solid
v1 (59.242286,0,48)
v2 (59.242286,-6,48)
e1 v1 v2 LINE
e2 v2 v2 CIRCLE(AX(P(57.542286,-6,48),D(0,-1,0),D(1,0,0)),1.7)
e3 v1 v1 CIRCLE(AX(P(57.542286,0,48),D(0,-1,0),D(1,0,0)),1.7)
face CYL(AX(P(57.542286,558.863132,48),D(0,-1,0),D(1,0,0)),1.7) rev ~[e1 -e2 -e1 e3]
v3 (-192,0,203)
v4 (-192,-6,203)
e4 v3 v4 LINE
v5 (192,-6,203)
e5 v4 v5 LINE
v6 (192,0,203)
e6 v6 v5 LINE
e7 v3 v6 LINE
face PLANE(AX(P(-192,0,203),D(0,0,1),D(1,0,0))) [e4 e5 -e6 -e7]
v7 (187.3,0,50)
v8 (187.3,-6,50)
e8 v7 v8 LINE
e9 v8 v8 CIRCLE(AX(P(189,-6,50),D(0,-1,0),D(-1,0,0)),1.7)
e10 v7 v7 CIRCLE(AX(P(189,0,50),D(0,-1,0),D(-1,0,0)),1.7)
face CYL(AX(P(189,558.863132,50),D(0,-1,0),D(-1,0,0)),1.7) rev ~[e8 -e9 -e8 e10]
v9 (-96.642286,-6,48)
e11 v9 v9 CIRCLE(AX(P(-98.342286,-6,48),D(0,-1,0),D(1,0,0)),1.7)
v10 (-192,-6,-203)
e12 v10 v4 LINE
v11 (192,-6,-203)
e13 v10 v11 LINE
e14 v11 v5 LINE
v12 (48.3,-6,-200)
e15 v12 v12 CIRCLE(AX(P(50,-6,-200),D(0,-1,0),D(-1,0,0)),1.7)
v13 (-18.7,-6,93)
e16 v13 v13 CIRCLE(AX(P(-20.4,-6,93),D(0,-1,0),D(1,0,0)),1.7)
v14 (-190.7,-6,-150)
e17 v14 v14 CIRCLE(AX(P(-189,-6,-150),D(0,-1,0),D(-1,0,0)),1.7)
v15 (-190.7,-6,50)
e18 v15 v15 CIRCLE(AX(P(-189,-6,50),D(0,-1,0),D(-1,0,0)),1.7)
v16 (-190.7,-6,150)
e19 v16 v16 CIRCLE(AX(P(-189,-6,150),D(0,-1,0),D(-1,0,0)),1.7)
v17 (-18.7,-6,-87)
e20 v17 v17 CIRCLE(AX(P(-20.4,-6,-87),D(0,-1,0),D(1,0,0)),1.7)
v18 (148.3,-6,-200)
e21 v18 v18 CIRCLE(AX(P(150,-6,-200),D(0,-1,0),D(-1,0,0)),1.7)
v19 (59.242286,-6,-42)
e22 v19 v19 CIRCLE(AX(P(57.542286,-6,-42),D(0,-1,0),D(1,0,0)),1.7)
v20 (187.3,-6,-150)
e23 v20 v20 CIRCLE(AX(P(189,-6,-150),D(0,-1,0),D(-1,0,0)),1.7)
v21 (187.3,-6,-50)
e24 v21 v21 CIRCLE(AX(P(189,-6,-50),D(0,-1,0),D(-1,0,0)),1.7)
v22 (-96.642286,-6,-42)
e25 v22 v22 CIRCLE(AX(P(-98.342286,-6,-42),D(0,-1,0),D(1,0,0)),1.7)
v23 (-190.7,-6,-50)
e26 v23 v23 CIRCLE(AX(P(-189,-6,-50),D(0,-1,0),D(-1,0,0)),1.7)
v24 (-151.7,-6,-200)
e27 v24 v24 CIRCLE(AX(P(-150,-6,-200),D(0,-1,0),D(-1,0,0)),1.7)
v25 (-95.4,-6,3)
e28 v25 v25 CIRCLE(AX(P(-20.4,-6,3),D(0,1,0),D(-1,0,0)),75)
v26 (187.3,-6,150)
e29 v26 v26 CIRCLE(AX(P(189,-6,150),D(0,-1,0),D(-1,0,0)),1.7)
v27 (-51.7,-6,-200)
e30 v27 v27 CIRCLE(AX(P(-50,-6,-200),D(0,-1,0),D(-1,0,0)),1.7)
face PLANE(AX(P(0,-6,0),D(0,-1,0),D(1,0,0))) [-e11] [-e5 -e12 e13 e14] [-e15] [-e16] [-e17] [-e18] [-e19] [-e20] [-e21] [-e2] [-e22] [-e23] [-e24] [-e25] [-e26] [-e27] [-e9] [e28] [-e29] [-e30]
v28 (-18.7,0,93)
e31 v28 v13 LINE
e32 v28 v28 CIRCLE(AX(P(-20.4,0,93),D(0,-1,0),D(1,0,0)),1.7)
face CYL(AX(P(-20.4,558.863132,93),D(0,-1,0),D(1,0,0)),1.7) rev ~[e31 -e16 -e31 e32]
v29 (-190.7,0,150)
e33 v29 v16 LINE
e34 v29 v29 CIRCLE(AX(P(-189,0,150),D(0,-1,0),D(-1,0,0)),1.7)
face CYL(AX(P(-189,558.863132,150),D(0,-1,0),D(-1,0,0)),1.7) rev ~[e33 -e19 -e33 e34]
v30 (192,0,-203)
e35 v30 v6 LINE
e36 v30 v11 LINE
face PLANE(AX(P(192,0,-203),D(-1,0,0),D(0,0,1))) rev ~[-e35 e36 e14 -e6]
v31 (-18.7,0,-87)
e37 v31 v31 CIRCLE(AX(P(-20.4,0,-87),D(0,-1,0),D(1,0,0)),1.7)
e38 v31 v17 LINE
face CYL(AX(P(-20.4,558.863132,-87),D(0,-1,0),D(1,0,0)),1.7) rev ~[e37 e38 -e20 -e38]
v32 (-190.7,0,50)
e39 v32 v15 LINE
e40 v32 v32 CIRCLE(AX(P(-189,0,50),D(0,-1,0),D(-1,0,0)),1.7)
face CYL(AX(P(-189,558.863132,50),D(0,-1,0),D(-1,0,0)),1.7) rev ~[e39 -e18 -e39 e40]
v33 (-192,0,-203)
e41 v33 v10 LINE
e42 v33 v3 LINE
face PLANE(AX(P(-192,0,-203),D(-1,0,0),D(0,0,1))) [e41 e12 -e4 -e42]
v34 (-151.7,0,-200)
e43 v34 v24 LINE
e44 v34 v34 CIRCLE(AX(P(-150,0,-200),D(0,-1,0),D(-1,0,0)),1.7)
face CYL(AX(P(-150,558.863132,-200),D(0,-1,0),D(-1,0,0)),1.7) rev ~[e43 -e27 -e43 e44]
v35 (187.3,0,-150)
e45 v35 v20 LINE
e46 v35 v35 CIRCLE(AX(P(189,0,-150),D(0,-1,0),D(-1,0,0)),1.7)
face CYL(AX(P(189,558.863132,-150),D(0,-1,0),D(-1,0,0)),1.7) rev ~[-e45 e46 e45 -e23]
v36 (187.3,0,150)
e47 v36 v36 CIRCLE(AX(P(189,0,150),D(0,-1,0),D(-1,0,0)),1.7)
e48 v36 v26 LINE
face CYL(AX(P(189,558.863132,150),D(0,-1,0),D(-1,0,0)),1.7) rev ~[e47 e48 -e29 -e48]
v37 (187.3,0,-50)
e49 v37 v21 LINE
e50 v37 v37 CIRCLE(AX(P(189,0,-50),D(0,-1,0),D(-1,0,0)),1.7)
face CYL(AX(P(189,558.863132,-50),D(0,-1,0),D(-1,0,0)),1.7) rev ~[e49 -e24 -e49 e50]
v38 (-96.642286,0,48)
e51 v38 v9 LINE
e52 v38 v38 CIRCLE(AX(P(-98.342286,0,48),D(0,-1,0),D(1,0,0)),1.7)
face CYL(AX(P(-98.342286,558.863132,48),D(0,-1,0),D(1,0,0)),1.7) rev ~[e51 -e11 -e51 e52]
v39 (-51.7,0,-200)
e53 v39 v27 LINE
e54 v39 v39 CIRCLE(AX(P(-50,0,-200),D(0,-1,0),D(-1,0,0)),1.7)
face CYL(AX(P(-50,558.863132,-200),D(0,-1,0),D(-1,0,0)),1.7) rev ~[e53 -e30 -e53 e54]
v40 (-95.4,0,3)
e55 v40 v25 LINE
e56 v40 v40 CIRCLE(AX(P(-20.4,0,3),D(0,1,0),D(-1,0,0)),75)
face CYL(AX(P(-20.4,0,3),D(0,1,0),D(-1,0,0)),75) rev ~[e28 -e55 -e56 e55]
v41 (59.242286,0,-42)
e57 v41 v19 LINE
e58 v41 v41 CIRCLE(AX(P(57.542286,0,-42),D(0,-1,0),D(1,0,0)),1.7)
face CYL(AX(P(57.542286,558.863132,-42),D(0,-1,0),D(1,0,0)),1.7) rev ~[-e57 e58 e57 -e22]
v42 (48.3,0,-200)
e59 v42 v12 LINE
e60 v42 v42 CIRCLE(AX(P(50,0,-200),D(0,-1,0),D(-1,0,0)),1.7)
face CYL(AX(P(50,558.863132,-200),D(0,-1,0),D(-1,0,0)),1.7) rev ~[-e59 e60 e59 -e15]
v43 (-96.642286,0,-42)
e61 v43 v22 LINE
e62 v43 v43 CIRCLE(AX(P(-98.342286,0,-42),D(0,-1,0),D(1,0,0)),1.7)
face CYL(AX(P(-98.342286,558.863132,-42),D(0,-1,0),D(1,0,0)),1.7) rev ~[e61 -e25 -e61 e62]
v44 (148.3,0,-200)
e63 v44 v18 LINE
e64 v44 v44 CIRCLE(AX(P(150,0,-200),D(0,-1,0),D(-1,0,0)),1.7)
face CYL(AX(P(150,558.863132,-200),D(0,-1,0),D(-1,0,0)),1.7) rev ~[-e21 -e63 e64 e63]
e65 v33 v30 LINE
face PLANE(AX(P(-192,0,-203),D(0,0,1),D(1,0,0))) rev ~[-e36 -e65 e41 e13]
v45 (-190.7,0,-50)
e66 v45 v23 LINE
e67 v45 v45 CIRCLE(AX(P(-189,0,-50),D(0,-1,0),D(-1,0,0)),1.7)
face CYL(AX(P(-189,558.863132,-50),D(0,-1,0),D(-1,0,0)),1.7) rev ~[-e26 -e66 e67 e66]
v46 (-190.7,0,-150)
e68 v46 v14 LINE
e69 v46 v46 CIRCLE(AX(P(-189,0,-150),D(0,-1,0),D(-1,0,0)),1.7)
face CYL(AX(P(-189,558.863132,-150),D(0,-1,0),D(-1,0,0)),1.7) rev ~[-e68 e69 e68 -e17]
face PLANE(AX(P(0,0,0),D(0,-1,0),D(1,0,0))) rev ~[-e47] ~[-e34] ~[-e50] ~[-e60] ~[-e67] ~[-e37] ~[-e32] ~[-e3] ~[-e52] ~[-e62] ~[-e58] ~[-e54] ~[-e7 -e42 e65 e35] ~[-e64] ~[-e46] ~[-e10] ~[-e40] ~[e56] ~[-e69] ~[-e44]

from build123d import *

# Parameters (mm, degrees)
F0_W     = 384
F0_H     = 406
F2_DEPTH = 6
F3_D     = 3.4
F5_D     = 3.4
F4_R     = 75
F6_DEPTH = 6
F8_D     = 3.4
F9_D     = 3.4
F10_D    = 3.4


# Not quite as in the source:
# - a feature names something its author has since deleted; it is built from what else it names


with BuildPart() as f2:
    # F0 (on Front) → F2 (new body)
    with BuildSketch(Plane.XZ):
        Rectangle(F0_W, F0_H)
    extrude(amount=F2_DEPTH)

    # F3 (through all)
    with Locations(Plane(origin=(0, 0, 0), x_dir=(1, 0, 0), z_dir=(0, 1, 0))):
        with Locations((189, -150), (189, -50), (189, 150), (150, 200), (-50, 200), (-150, 200), (-189, -50), (-189, -150), (-189, 50)):
            Hole(F3_D / 2)

    # F5 (through all)
    with Locations(Plane(origin=(0, 0, 0), x_dir=(-1, 0, 0), z_dir=(0, 1, 0))):
        with Locations((98.3422863406, 48), (20.4, -87), (-57.5422863406, 48), (98.3422863406, -42), (20.4, 93), (-57.5422863406, -42)):
            Hole(F5_D / 2)


with BuildPart() as f6:
    # F4 (on face) → F6 (new body)
    with BuildSketch(Plane(origin=(0, 0, 0), x_dir=(-1, 0, 0), z_dir=(0, 1, 0))):
        with Locations((20.4, 3)):
            Circle(F4_R)
    extrude(amount=-F6_DEPTH)


with BuildPart() as f2_1:
    add(f2.part)

    # F7: cut F6
    add(f6.part, mode=Mode.SUBTRACT)

    # F8 (through all)
    with Locations(Plane(origin=(0, 0, 0), x_dir=(1, 0, 0), z_dir=(0, 1, 0))):
        with Locations((-189, 150)):
            Hole(F8_D / 2)

    # F9 (through all)
    with Locations(Plane(origin=(0, 0, 0), x_dir=(1, 0, 0), z_dir=(0, 1, 0))):
        with Locations((189, 50)):
            Hole(F9_D / 2)

    # F10 (through all)
    with Locations(Plane(origin=(0, 0, 0), x_dir=(1, 0, 0), z_dir=(0, 1, 0))):
        with Locations((50, 200)):
            Hole(F10_D / 2)


solid = f2_1.part
